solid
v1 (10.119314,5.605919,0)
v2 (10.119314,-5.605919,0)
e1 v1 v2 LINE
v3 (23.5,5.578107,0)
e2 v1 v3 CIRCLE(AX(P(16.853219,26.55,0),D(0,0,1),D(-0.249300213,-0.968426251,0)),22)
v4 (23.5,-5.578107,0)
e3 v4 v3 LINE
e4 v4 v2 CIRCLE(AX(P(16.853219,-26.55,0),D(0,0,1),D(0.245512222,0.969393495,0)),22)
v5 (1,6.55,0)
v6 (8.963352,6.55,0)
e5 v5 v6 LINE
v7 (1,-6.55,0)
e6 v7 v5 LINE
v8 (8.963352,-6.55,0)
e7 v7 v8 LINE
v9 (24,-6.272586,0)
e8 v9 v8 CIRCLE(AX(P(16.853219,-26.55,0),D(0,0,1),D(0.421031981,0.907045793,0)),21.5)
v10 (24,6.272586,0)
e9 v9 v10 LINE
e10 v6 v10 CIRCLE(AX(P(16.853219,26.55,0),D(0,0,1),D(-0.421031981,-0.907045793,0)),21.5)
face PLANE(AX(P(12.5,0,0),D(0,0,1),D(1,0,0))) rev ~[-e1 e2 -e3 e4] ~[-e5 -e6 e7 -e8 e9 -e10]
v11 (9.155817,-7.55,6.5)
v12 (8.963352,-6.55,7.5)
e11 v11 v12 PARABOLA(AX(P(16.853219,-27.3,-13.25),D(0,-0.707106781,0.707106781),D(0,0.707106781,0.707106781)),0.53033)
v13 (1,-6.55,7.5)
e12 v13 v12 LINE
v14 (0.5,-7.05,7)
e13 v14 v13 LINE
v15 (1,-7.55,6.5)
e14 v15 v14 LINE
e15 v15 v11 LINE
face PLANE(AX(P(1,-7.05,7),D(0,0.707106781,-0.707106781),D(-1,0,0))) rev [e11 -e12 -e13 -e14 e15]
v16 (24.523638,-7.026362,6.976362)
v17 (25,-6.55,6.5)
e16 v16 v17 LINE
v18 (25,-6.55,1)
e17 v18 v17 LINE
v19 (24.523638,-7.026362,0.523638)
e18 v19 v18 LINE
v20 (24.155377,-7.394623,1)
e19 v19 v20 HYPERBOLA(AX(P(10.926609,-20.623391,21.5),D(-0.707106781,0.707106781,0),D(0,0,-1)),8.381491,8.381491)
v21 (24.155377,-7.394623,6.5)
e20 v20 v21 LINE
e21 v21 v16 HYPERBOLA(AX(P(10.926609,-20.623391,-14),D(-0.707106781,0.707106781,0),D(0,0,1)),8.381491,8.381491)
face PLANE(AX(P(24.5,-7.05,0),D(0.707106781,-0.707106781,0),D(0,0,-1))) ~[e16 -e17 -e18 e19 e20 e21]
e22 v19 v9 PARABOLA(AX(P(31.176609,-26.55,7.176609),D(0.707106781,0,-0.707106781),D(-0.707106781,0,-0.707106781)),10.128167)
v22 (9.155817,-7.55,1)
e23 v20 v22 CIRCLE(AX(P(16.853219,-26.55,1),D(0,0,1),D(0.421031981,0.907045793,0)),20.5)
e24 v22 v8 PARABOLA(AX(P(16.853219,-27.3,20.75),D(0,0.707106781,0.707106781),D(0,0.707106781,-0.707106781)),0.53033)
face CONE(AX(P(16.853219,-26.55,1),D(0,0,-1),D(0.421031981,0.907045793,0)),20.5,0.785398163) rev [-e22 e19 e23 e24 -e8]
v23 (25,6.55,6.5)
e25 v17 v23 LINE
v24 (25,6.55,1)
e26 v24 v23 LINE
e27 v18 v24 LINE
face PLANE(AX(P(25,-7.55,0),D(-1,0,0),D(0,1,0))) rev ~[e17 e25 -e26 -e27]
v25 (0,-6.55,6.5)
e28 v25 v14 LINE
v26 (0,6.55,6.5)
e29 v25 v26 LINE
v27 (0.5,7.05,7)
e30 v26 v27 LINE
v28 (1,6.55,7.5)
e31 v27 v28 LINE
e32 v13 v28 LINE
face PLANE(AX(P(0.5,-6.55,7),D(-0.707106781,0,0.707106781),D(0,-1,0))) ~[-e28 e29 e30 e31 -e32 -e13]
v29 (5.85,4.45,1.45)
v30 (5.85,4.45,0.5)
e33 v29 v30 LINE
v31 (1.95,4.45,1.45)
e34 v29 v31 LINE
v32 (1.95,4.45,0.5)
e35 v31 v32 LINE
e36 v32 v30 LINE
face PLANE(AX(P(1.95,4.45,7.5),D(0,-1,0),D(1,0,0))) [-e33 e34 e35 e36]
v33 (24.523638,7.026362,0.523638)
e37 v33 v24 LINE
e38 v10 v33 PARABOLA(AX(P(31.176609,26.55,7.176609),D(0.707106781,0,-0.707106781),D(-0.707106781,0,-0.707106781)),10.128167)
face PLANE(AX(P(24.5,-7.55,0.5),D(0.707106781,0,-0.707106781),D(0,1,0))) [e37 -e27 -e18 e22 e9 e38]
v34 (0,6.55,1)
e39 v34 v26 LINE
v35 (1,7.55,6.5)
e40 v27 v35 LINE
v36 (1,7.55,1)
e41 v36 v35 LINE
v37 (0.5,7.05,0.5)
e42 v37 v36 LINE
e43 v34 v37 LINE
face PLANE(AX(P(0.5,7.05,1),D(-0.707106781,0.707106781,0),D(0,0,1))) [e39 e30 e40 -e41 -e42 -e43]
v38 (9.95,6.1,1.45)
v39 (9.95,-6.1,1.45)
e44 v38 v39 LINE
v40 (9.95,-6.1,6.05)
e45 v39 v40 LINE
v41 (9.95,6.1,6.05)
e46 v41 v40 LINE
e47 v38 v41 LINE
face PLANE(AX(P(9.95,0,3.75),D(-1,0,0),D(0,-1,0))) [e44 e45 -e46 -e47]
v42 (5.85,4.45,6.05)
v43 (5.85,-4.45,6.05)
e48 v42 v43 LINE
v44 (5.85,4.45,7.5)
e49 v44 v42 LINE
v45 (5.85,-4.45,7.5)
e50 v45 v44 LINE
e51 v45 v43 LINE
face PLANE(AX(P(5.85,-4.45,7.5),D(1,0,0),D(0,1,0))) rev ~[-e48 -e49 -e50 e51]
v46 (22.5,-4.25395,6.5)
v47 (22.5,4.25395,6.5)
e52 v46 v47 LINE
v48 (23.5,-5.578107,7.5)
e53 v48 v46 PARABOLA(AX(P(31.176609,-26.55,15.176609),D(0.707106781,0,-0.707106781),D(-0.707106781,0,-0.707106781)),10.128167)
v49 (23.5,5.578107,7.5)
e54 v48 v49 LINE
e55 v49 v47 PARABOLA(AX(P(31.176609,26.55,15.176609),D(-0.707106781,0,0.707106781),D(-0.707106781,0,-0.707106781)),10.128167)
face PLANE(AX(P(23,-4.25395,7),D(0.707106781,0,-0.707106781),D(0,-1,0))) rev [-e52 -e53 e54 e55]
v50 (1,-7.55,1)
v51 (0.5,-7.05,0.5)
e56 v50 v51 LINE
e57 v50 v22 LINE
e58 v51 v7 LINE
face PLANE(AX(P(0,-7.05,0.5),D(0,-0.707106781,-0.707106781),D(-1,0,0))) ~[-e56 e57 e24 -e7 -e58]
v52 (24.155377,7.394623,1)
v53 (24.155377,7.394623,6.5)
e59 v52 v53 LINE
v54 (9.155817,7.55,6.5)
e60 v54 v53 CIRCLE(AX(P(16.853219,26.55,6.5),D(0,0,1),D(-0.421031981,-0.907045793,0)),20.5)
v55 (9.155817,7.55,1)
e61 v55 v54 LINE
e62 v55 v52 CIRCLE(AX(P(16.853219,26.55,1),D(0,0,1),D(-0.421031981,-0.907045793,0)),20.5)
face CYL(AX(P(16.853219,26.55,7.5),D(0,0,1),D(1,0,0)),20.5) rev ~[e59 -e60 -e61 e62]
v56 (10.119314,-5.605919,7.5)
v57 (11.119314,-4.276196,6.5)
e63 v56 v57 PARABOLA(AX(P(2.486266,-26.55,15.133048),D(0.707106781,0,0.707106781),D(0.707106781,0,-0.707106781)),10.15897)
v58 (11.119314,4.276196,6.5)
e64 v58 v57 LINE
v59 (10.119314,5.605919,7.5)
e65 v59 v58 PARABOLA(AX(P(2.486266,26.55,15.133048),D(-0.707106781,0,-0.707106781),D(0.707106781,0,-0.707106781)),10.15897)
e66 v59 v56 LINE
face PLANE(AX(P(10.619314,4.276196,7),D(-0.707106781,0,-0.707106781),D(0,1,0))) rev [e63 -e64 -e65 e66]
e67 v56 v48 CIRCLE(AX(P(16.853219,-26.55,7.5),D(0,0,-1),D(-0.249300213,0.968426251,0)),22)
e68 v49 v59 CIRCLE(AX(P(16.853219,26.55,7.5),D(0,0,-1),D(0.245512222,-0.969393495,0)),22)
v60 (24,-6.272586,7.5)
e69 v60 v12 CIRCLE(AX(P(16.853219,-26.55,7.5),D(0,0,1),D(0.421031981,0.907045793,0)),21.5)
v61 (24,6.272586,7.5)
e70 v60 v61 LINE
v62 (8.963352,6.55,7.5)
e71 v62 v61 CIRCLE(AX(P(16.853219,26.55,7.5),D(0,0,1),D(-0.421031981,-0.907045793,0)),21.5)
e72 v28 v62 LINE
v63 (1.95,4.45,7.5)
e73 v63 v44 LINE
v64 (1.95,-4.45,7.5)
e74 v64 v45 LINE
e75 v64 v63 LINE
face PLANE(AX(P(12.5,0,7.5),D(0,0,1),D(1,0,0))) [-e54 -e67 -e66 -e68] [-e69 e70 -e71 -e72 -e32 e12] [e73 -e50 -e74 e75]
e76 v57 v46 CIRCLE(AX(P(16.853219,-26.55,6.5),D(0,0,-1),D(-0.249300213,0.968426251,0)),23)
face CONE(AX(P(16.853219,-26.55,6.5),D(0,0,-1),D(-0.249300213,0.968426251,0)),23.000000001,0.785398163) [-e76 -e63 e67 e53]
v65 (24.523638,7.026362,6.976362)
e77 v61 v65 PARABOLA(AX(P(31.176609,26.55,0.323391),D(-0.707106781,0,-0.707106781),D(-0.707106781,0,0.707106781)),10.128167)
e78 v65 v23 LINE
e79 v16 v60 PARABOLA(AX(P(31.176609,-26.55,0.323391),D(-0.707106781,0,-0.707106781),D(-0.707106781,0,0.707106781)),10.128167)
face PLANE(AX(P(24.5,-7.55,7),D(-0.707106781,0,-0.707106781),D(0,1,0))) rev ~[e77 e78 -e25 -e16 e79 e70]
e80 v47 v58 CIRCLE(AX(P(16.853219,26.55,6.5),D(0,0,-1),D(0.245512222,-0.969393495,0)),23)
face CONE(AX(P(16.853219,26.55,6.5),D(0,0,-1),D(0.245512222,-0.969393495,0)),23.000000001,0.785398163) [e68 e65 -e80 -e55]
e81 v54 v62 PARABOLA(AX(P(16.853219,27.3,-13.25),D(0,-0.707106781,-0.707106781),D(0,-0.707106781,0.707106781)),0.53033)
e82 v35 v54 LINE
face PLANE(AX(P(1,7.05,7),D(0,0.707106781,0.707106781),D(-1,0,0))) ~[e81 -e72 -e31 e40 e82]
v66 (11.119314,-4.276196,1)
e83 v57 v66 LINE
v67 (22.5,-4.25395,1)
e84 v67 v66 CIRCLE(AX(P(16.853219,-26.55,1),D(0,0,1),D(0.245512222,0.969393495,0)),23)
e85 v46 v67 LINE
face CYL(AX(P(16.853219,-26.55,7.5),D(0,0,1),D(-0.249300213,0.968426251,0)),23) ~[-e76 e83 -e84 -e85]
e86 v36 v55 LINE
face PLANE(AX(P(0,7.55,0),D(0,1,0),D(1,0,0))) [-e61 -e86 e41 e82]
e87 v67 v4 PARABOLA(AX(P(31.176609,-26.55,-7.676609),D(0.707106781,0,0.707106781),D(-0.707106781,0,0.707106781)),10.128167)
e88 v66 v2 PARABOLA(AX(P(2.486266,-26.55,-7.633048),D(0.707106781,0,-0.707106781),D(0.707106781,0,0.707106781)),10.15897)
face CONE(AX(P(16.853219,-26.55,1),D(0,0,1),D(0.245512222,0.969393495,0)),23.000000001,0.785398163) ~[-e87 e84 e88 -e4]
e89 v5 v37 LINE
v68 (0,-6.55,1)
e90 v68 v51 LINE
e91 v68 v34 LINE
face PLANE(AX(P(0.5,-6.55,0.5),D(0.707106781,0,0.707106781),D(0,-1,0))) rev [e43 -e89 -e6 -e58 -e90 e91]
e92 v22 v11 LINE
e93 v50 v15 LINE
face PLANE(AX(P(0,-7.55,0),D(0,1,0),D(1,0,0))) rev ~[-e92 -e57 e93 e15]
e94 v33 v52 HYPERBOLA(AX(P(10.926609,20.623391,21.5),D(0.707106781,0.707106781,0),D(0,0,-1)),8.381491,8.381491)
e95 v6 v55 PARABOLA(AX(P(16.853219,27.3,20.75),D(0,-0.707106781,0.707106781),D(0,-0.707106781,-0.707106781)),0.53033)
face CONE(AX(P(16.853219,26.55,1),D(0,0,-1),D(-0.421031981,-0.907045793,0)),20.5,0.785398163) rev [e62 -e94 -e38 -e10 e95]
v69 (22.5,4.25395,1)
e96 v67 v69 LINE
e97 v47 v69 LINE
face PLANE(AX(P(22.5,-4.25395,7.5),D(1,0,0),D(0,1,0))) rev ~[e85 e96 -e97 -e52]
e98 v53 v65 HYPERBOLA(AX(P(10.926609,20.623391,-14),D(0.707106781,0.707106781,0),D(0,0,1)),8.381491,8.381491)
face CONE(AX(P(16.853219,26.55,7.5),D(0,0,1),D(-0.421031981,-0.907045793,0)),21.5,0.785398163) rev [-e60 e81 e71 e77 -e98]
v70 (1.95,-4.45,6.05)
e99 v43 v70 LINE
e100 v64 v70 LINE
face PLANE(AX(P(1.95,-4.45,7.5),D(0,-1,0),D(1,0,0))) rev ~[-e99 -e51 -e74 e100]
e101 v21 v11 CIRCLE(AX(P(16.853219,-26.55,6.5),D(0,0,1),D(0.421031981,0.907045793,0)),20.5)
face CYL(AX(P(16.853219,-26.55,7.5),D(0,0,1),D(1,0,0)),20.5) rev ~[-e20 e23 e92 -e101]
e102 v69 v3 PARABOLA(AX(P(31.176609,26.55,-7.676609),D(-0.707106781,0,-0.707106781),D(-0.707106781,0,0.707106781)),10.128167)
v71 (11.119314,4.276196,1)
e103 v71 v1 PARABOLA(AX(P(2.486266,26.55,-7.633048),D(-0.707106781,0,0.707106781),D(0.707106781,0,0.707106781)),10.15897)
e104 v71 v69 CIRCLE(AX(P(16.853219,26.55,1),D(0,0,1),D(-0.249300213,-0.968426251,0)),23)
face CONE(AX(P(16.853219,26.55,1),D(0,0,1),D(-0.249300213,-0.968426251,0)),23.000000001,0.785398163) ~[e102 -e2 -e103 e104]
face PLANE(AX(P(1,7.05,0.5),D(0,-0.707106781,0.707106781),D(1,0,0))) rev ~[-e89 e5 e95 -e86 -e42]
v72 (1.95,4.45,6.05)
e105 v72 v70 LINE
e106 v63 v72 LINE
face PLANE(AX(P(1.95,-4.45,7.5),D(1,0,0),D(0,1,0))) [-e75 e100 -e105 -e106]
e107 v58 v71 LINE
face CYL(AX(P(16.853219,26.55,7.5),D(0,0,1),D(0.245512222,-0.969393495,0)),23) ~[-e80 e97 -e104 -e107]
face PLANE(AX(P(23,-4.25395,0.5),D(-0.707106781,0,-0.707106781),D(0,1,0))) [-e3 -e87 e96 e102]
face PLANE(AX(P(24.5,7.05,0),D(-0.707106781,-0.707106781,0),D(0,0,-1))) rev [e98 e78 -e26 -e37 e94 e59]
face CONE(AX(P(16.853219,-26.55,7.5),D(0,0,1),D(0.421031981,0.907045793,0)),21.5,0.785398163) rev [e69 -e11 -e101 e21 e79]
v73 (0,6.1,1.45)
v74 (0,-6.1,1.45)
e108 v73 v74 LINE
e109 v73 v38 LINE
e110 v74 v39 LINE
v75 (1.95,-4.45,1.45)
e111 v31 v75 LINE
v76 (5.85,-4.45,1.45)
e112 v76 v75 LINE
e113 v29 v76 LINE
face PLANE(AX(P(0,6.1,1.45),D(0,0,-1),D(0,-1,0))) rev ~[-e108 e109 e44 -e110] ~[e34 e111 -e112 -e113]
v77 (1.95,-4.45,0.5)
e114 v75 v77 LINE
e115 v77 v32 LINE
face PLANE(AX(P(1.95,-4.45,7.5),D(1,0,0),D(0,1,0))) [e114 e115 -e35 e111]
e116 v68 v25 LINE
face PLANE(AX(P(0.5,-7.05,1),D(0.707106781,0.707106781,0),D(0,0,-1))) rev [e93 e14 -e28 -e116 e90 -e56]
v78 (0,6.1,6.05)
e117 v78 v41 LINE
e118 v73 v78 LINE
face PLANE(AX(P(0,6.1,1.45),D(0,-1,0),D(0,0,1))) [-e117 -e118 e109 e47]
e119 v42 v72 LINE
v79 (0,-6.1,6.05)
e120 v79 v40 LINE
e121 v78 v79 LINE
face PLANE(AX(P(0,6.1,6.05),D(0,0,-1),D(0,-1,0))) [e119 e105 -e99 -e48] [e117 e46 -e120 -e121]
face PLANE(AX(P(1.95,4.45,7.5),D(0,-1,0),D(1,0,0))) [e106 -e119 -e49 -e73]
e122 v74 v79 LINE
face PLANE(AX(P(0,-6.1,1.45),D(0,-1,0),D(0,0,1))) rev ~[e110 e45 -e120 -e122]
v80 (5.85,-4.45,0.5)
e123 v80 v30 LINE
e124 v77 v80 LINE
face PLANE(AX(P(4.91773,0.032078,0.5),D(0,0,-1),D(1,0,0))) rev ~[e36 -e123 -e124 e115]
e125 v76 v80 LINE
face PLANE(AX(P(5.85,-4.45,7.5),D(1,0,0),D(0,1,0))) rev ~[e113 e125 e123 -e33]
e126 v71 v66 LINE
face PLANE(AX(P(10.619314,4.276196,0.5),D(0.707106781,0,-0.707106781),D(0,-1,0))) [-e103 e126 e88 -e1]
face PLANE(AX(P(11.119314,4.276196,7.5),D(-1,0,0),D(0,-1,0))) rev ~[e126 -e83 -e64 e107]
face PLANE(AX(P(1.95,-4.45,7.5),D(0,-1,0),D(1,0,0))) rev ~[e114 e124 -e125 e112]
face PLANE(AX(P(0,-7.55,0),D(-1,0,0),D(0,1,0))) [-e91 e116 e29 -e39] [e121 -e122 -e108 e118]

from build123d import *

# Parameters (mm, degrees)
F0_W         = 25
F0_H         = 15.1
F1_DEPTH     = 7.5
F2_W         = 12.2
F2_H         = 4.6
F3_DEPTH     = 9.95
F4_W         = 3.9
F4_H         = 8.9
F5_DEPTH     = 25
F6_SIZE      = 1
F7_C1_SIZE   = 1
F7_C2_SIZE   = 1
F7_C3_SIZE   = 1
F7_C4_SIZE   = 1
F7_C5_SIZE   = 1
F7_C6_SIZE   = 1
F7_C7_SIZE   = 1
F7_C8_SIZE   = 1
F8_R         = 20.5
F9_DEPTH     = 25
F10_T2_ANGLE = 49.7995158882
F10_T4_ANGLE = 49.7995158882
F10_T6_ANGLE = 49.7995158882
F10_T8_ANGLE = 49.7995158882
F12_DEPTH    = 25
F13_SIZE     = 1
F14_W        = 6.9057337241
F14_H        = 9.9417776801
F15_DEPTH    = 0.5


# Not quite as in the source:
# - a fillet or chamfer that OpenCascade refuses, or shapes differently, is made with other operations: its cross-section is extruded or revolved along the edge and cut away or added


with BuildPart() as f1:
    # F0 (on Top) → F1 (new body)
    with BuildSketch(Plane.XY):
        with Locations((12.5, 0)):
            Rectangle(F0_W, F0_H)
    extrude(amount=F1_DEPTH)

    # F2 (on face) → F3 (cut)
    with BuildSketch(Plane(origin=(0, 0, 0), x_dir=(0, -1, 0), z_dir=(-1, 0, 0))):
        with Locations((0, 3.75)):
            Rectangle(F2_W, F2_H)
    extrude(amount=-F3_DEPTH, mode=Mode.SUBTRACT)

    # F4 (on face) → F5 (cut)
    with BuildSketch(Plane.XY.offset(7.5)):
        with Locations((3.9, 0)):
            Rectangle(F4_W, F4_H)
    extrude(amount=-F5_DEPTH, mode=Mode.SUBTRACT)

    # F6
    f6_edges = [f1.edges().sort_by_distance(p)[0] for p in [
        (25, -7.55, 3.75),
        (25, 7.55, 3.75),
        (25, 0, 0),
        (25, 0, 7.5),
    ]]
    chamfer(f6_edges, length=F6_SIZE)

    # F7: chamfer of 1 on 8 edges, made by hand

    # F7_c1
    f7_c1_edges = [f1.edges().sort_by_distance(p)[0] for p in [
        (12, -7.55, 0),
    ]]
    chamfer(f7_c1_edges, length=F7_C1_SIZE)

    # F7_c2
    f7_c2_edges = [f1.edges().sort_by_distance(p)[0] for p in [
        (0, -7.55, 4.25),
    ]]
    chamfer(f7_c2_edges, length=F7_C2_SIZE)

    # F7_c3
    f7_c3_edges = [f1.edges().sort_by_distance(p)[0] for p in [
        (12.5, -7.55, 7.5),
    ]]
    chamfer(f7_c3_edges, length=F7_C3_SIZE)

    # F7_c4
    f7_c4_edges = [f1.edges().sort_by_distance(p)[0] for p in [
        (0, 0.5, 0),
    ]]
    chamfer(f7_c4_edges, length=F7_C4_SIZE)

    # F7_c5
    f7_c5_edges = [f1.edges().sort_by_distance(p)[0] for p in [
        (12.5, 7.55, 0),
    ]]
    chamfer(f7_c5_edges, length=F7_C5_SIZE)

    # F7_c6
    f7_c6_edges = [f1.edges().sort_by_distance(p)[0] for p in [
        (0, 0.5, 7.5),
    ]]
    chamfer(f7_c6_edges, length=F7_C6_SIZE)

    # F7_c7
    f7_c7_edges = [f1.edges().sort_by_distance(p)[0] for p in [
        (12.5, 7.55, 7.5),
    ]]
    chamfer(f7_c7_edges, length=F7_C7_SIZE)

    # F7_c8
    f7_c8_edges = [f1.edges().sort_by_distance(p)[0] for p in [
        (0, 7.55, 3.75),
    ]]
    chamfer(f7_c8_edges, length=F7_C8_SIZE)

    # F8 (on face) → F9 (cut)
    with BuildSketch(Plane.XY.offset(7.5)):
        with Locations((16.8532188982, 26.55)):
            Circle(F8_R)
        with Locations((16.8532188982, -26.55)):
            Circle(F8_R)
    extrude(amount=-F9_DEPTH, mode=Mode.SUBTRACT)

    # F10: chamfer of 1 on 4 edges, made by hand

    # F10_s1 → F10_t2 (revolve, cut)
    with BuildSketch(Plane(origin=(24.005003563, -11.1426284002, 0), x_dir=(0, 0, 1), z_dir=(0.907045793, -0.4210319814, 0))):
        Polygon((7.5, -4.5136783409), (6.5, -3.5136783409), (7.5, -3.5136783409), align=None)
    revolve(axis=Axis((16.8532188982, -26.55, 7.5), (0, 0, 1)), revolution_arc=F10_T2_ANGLE, mode=Mode.SUBTRACT)

    # F10_s3 → F10_t4 (revolve, cut)
    with BuildSketch(Plane(origin=(3.7263637991, -1.7297013511, 0), x_dir=(0, 0, 1), z_dir=(-0.907045793, 0.4210319814, 0))):
        Polygon((7.5, 9.6778099504), (6.5, 10.6778099504), (7.5, 10.6778099504), align=None)
    revolve(axis=Axis((16.8532188982, 26.55, 7.5), (0, 0, 1)), revolution_arc=F10_T4_ANGLE, mode=Mode.SUBTRACT)

    # F10_s5 → F10_t6 (revolve, cut)
    with BuildSketch(Plane(origin=(24.005003563, -11.1426284002, 0), x_dir=(0, 0, 1), z_dir=(0.907045793, -0.4210319814, 0))):
        Polygon((1, -3.5136783409), (0, -4.5136783409), (0, -3.5136783409), align=None)
    revolve(axis=Axis((16.8532188982, -26.55, 0), (0, 0, 1)), revolution_arc=F10_T6_ANGLE, mode=Mode.SUBTRACT)

    # F10_s7 → F10_t8 (revolve, cut)
    with BuildSketch(Plane(origin=(3.7263637991, -1.7297013511, 0), x_dir=(0, 0, 1), z_dir=(-0.907045793, 0.4210319814, 0))):
        Polygon((1, 10.6778099504), (0, 9.6778099504), (0, 10.6778099504), align=None)
    revolve(axis=Axis((16.8532188982, 26.55, 0), (0, 0, 1)), revolution_arc=F10_T8_ANGLE, mode=Mode.SUBTRACT)

    # F11 (on face) → F12 (cut)
    with BuildSketch(Plane.XY.offset(7.5)):
        with BuildLine():
            ThreePointArc((11.1193139957, -4.2761962258), (16.8082592809, -3.5500439428), (22.5, -4.2539496056))
            Line((22.5, -4.2539496056), (22.5, 4.2539496056))
            ThreePointArc((22.5, 4.2539496056), (16.8082592809, 3.5500439428), (11.1193139957, 4.2761962258))
            Line((11.1193139957, 4.2761962258), (11.1193139957, -4.2761962258))
        make_face()
    extrude(amount=-F12_DEPTH, mode=Mode.SUBTRACT)

    # F13
    f13_edges = [f1.edges().sort_by_distance(p)[0] for p in [
        (11.119314, 0, 7.5),
        (16.808259, 3.550044, 7.5),
        (22.5, 0, 7.5),
        (16.808259, -3.550044, 7.5),
        (11.119314, 0, 0),
        (16.808259, 3.550044, 0),
        (22.5, 0, 0),
        (16.808259, -3.550044, 0),
    ]]
    chamfer(f13_edges, length=F13_SIZE)

    # F14 (on face) → F15 (join)
    with BuildSketch(Plane(origin=(0, 0, 0), x_dir=(1, 0, 0), z_dir=(0, 0, -1))):
        with Locations((4.9177300534, -0.0320777763)):
            Rectangle(F14_W, F14_H)
    extrude(amount=-F15_DEPTH)


solid = f1.part
